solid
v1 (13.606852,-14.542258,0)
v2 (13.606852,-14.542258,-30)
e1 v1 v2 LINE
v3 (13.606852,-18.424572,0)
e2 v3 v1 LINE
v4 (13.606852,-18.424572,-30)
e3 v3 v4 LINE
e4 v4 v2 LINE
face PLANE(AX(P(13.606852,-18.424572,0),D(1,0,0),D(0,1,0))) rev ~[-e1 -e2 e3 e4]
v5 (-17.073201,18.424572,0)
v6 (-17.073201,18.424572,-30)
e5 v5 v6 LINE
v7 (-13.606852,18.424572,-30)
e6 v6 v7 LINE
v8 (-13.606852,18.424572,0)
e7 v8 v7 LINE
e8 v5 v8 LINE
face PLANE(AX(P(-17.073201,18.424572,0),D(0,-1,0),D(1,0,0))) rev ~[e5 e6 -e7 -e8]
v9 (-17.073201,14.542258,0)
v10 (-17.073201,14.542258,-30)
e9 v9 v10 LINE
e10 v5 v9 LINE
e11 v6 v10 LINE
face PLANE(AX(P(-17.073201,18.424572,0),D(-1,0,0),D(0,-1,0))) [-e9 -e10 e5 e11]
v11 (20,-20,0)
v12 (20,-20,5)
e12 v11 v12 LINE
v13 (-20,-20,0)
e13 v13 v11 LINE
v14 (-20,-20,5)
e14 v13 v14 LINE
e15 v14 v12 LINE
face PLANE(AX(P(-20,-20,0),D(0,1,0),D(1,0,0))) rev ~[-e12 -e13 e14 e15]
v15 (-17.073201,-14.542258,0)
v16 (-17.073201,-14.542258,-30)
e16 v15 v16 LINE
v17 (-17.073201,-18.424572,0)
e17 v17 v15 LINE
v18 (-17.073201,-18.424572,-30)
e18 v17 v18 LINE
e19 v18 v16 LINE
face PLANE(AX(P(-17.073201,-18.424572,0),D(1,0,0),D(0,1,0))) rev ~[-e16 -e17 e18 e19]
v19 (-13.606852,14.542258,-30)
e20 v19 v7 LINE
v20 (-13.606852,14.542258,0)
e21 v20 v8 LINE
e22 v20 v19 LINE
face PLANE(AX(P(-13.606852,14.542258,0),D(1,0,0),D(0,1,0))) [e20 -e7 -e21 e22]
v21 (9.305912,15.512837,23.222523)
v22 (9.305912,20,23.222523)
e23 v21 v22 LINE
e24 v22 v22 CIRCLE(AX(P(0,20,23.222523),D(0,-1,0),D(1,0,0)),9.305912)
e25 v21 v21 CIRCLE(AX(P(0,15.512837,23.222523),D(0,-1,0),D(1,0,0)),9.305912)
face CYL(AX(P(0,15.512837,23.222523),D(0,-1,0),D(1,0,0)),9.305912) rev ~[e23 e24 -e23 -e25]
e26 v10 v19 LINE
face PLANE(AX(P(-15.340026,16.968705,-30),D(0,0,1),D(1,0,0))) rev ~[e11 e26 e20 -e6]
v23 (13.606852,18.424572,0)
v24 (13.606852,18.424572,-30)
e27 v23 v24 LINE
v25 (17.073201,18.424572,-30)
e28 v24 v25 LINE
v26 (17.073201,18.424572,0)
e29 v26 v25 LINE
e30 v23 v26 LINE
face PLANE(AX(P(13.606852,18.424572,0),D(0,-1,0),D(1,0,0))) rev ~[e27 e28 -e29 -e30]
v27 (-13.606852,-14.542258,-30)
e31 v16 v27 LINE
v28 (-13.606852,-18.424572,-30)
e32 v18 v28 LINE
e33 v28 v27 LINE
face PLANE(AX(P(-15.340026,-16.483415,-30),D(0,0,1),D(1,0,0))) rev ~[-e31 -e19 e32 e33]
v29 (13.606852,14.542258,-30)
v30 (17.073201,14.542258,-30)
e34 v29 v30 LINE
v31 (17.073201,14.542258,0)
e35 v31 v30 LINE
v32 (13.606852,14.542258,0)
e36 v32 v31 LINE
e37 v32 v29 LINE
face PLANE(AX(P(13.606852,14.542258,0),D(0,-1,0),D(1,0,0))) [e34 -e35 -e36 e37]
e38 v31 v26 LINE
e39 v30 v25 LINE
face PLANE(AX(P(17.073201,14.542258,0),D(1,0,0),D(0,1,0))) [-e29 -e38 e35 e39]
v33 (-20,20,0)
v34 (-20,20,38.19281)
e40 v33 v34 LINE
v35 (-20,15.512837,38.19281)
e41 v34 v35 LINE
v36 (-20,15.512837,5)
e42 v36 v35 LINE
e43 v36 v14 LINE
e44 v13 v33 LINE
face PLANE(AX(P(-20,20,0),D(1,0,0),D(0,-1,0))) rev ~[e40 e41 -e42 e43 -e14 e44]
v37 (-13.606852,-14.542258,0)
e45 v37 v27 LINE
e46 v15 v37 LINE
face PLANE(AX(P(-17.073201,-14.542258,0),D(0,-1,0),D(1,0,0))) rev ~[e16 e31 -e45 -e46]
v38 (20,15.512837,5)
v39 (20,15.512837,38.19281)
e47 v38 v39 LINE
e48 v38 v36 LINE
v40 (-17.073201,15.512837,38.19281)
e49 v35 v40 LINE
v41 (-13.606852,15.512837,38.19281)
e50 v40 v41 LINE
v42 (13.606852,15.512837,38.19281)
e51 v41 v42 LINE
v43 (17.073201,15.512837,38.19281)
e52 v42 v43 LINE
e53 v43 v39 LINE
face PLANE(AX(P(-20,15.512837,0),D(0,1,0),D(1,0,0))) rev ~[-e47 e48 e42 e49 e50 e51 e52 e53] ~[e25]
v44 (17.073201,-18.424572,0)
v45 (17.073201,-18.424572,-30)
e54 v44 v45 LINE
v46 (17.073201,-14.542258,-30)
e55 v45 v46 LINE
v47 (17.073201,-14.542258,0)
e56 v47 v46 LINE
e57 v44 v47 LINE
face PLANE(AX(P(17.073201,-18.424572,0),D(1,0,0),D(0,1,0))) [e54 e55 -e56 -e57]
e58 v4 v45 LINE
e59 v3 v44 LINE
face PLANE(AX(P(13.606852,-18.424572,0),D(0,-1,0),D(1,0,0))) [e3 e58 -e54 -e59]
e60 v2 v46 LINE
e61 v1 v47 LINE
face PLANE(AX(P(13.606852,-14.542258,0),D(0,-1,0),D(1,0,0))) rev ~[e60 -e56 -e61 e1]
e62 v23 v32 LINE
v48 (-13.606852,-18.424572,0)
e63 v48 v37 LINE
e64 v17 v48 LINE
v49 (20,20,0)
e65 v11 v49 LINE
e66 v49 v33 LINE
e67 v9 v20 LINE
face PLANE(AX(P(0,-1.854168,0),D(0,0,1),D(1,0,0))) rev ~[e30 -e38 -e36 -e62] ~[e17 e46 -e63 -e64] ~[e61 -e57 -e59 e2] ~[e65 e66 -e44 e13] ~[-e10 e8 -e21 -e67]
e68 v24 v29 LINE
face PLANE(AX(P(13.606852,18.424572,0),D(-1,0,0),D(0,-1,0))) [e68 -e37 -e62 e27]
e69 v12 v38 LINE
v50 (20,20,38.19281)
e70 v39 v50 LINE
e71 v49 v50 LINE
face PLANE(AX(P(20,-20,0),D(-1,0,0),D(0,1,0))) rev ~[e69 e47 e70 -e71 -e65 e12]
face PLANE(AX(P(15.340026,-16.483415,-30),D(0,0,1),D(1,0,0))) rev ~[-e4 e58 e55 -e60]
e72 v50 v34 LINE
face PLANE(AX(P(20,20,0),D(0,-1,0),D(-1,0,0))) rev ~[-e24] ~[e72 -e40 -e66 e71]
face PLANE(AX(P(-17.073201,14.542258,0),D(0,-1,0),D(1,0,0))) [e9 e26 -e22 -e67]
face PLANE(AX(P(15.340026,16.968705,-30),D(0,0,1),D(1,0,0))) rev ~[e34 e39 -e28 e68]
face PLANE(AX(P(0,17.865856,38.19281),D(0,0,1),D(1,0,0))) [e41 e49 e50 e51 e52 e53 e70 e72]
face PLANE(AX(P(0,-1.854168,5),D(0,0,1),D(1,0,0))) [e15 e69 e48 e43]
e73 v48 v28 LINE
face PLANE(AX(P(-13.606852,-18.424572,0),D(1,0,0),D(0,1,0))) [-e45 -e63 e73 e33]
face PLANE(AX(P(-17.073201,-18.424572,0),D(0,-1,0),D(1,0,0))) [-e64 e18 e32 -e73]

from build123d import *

# Parameters (mm, degrees)
F0_W     = 3.4663490951
F0_H     = 3.8823140785
F0_H_2   = 2.9117353261
F0_H_3   = 0.9705787525
F1_DEPTH = 5
F2_DEPTH = 30
F3_DEPTH = 38.19281
F4_R     = 9.3059115505
F5_DEPTH = 4.488162903


with BuildPart() as f1:
    # F0 (on Top) → F1 (new body)
    with BuildSketch(Plane.XY):
        Polygon((20, -20), (20, 15.512837097), (17.0732010156, 15.512837097), (17.0732010156, 14.5422583446), (13.6068519205, 14.5422583446), (13.6068519205, 15.512837097), (-13.6068519205, 15.512837097), (-13.6068519205, 14.5422583446), (-17.0732010156, 14.5422583446), (-17.0732010156, 15.512837097), (-20, 15.512837097), (-20, -20), align=None)
        with Locations((-15.340026468, -16.4834153838)):
            Rectangle(F0_W, F0_H, mode=Mode.SUBTRACT)
        with Locations((15.340026468, -16.4834153838)):
            Rectangle(F0_W, F0_H, mode=Mode.SUBTRACT)
        Polygon((20, 15.512837097), (20, 20), (-20, 20), (-20, 15.512837097), (-17.0732010156, 15.512837097), (-17.0732010156, 18.4245724231), (-13.6068519205, 18.4245724231), (-13.6068519205, 15.512837097), (13.6068519205, 15.512837097), (13.6068519205, 18.4245724231), (17.0732010156, 18.4245724231), (17.0732010156, 15.512837097), align=None)
        with Locations((15.340026468, -16.4834153838)):
            Rectangle(F0_W, F0_H)
        with Locations((-15.340026468, -16.4834153838)):
            Rectangle(F0_W, F0_H)
        with Locations((15.340026468, 16.9687047601)):
            Rectangle(F0_W, F0_H_2)
        with Locations((-15.340026468, 16.9687047601)):
            Rectangle(F0_W, F0_H_2)
        with Locations((15.340026468, 15.0275477208)):
            Rectangle(F0_W, F0_H_3)
        with Locations((-15.340026468, 15.0275477208)):
            Rectangle(F0_W, F0_H_3)
    extrude(amount=F1_DEPTH)

    # F0 (on Top) → F2 (join)
    with BuildSketch(Plane.XY):
        with Locations((15.340026468, -16.4834153838)):
            Rectangle(F0_W, F0_H)
        with Locations((-15.340026468, -16.4834153838)):
            Rectangle(F0_W, F0_H)
        with Locations((-15.340026468, 16.9687047601)):
            Rectangle(F0_W, F0_H_2)
        with Locations((15.340026468, 16.9687047601)):
            Rectangle(F0_W, F0_H_2)
        with Locations((15.340026468, 15.0275477208)):
            Rectangle(F0_W, F0_H_3)
        with Locations((-15.340026468, 15.0275477208)):
            Rectangle(F0_W, F0_H_3)
    extrude(amount=-F2_DEPTH)

    # F0 (on Top) → F3 (join)
    with BuildSketch(Plane.XY):
        Polygon((20, 15.512837097), (20, 20), (-20, 20), (-20, 15.512837097), (-17.0732010156, 15.512837097), (-17.0732010156, 18.4245724231), (-13.6068519205, 18.4245724231), (-13.6068519205, 15.512837097), (13.6068519205, 15.512837097), (13.6068519205, 18.4245724231), (17.0732010156, 18.4245724231), (17.0732010156, 15.512837097), align=None)
        with Locations((-15.340026468, 16.9687047601)):
            Rectangle(F0_W, F0_H_2)
        with Locations((15.340026468, 16.9687047601)):
            Rectangle(F0_W, F0_H_2)
    extrude(amount=F3_DEPTH)

    # F4 (on face) → F5 (cut, through all)
    with BuildSketch(Plane.XZ.offset(-15.512837097)):
        with Locations((0, 23.2225228101)):
            Circle(F4_R)
    extrude(amount=-F5_DEPTH, mode=Mode.SUBTRACT)


solid = f1.part
